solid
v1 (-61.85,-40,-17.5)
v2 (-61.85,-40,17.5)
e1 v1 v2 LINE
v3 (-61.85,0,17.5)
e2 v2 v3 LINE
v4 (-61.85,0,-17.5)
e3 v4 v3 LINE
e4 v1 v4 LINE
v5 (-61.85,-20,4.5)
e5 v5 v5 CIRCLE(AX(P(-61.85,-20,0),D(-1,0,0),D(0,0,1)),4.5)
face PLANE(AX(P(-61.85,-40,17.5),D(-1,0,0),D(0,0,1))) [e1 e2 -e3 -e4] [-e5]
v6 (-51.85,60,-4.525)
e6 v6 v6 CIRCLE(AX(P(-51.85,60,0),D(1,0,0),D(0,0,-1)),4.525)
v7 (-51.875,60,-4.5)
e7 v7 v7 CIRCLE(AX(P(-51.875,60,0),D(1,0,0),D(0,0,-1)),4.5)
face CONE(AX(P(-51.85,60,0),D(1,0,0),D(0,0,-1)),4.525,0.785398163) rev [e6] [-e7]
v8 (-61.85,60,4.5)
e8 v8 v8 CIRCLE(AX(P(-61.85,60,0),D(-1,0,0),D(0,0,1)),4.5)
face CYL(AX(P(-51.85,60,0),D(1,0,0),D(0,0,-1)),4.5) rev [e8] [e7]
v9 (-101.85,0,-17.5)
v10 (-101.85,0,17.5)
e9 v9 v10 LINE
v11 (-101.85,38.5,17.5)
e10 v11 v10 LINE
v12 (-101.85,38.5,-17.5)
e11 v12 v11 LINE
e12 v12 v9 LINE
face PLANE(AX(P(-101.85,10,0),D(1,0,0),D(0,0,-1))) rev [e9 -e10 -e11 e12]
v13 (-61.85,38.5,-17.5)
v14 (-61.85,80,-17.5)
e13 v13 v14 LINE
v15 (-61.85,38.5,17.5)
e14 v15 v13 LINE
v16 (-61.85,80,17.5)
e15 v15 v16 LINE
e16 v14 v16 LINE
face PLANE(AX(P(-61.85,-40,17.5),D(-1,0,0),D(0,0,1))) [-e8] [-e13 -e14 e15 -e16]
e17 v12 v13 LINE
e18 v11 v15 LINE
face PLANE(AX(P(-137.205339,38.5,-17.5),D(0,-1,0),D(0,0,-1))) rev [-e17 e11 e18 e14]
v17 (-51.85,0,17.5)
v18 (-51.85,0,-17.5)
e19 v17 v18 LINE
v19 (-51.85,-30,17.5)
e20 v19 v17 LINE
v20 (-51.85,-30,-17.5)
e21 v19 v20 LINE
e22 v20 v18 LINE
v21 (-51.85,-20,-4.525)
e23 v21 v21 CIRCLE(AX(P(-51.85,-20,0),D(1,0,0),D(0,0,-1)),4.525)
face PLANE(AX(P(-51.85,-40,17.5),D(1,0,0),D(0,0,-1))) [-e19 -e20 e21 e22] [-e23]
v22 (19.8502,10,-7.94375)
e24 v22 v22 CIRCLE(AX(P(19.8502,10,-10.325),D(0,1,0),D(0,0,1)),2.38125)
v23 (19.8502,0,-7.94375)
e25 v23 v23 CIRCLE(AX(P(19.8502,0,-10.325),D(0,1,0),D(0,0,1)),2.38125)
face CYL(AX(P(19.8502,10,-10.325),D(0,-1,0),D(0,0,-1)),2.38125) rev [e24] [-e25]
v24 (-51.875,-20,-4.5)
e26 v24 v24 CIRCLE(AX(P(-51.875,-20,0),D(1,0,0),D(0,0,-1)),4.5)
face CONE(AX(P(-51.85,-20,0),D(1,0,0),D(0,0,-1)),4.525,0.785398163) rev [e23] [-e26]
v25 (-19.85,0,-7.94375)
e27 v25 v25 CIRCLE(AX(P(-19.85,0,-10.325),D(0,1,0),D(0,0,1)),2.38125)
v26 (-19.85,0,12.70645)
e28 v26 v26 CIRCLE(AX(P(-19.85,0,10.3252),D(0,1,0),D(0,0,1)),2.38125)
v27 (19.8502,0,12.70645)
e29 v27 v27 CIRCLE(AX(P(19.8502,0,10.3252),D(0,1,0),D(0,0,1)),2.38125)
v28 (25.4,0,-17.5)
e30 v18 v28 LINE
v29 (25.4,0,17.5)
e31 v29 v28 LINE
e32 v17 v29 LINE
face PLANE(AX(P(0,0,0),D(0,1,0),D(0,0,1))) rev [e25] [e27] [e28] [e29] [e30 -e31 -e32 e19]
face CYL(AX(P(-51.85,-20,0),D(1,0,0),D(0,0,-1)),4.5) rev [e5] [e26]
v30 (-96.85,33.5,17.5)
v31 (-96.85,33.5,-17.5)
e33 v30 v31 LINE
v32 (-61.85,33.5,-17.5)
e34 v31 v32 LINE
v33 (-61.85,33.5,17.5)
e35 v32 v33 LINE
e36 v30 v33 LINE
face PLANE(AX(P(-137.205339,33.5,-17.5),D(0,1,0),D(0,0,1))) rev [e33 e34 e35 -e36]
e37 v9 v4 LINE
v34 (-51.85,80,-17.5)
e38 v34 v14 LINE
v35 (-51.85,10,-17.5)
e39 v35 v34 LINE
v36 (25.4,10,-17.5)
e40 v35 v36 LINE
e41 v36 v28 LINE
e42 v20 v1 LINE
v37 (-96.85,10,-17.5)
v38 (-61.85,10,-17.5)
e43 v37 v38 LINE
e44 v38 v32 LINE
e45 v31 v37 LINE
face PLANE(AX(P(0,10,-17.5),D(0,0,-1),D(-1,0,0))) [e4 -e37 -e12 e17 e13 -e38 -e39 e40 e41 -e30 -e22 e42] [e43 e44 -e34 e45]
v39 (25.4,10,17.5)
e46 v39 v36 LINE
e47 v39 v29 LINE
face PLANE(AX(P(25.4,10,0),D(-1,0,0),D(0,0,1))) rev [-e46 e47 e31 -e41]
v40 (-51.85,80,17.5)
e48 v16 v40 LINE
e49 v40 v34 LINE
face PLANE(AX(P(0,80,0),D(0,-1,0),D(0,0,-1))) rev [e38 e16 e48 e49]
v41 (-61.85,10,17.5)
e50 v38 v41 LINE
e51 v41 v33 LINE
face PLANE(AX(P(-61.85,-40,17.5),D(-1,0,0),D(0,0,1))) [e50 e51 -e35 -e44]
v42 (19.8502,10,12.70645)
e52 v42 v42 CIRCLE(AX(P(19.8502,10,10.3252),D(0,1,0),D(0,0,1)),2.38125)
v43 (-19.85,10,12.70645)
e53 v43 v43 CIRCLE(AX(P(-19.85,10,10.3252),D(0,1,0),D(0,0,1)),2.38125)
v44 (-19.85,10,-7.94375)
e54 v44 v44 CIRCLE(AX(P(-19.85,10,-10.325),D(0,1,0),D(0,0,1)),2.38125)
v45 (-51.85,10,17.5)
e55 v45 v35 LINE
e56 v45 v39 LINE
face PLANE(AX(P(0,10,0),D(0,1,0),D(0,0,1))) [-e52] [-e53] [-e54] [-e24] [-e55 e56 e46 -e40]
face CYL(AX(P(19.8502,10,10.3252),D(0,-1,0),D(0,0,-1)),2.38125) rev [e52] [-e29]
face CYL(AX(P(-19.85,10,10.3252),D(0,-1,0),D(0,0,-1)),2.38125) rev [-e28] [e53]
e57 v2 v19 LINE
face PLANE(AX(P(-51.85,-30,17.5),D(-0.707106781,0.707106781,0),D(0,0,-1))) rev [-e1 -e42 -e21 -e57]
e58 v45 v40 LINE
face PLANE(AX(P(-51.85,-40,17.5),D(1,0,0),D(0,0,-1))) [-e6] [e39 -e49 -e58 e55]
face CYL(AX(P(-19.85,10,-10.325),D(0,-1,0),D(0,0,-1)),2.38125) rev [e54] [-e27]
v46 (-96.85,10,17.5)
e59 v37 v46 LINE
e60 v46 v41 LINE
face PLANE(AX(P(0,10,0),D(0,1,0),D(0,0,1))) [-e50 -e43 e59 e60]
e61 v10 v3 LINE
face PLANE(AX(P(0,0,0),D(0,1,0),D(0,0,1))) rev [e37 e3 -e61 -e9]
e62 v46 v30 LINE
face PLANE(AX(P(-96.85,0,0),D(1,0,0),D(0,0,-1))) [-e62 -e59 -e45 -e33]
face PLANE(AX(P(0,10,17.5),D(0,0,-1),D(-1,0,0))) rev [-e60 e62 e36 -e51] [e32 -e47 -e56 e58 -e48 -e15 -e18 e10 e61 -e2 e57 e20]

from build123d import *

# Parameters (mm, degrees)
BOSS_EXTRUDE1_OUTLINE_W        = 127.25
BOSS_EXTRUDE1_OUTLINE_H        = 35
BOSS_EXTRUDE1_OUTLINE_R        = 2.38125
BOSS_EXTRUDE1_DEPTH            = 10
BOSS_EXTRUDE2_DEPTH            = 70
BOSS_EXTRUDE2_DEPTH_BACK       = 50
SKETCH2_W                      = 10
SKETCH2_H                      = 35
CHAMFER1_SIZE                  = 10
SKETCH8_W                      = 35
SKETCH8_H                      = 5
BOSS_EXTRUDE4_DEPTH            = 40
SKETCH9_W                      = 35
SKETCH9_H                      = 23.5
BOSS_EXTRUDE5_DEPTH            = 5
M8_CLEARANCE_HOLE2_D           = 9
M8_CLEARANCE_HOLE2_DEPTH       = 23
M8_CLEARANCE_HOLE2_CSINK_D     = 9.05
M8_CLEARANCE_HOLE2_CSINK_ANGLE = 90
M8_CLEARANCE_HOLE2_TIP         = 2.703872786


# Read off the part's stored shape, not the designer's step: Boss-Extrude1
with BuildPart() as part:
    # Boss-Extrude1 outline → Boss-Extrude1 (new body)
    with BuildSketch(Plane(origin=(0, 0, 0), x_dir=(1, 0, 0), z_dir=(0, 1, 0))):
        with Locations((-38.225, 0)):
            Rectangle(BOSS_EXTRUDE1_OUTLINE_W, BOSS_EXTRUDE1_OUTLINE_H)
        with Locations((-19.85, -10.3252)):
            Circle(BOSS_EXTRUDE1_OUTLINE_R, mode=Mode.SUBTRACT)
        with Locations((19.8502, -10.3252)):
            Circle(BOSS_EXTRUDE1_OUTLINE_R, mode=Mode.SUBTRACT)
        with Locations((-19.85, 10.325)):
            Circle(BOSS_EXTRUDE1_OUTLINE_R, mode=Mode.SUBTRACT)
        with Locations((19.8502, 10.325)):
            Circle(BOSS_EXTRUDE1_OUTLINE_R, mode=Mode.SUBTRACT)
    extrude(amount=BOSS_EXTRUDE1_DEPTH)

    # Sketch2 → Boss-Extrude2 (add, two sides: drawn at the far end of the back side and taken through both)
    with BuildSketch(Plane(origin=(0, 10, 0), x_dir=(1, 0, 0), z_dir=(0, 1, 0)).offset(-BOSS_EXTRUDE2_DEPTH_BACK)):
        with Locations((-56.85, 0)):
            Rectangle(SKETCH2_W, SKETCH2_H)
    extrude(amount=BOSS_EXTRUDE2_DEPTH + BOSS_EXTRUDE2_DEPTH_BACK)

    # Chamfer1
    chamfer1_edges = [part.edges().sort_by_distance(p)[0] for p in [
        (-51.85, -40, 0),
    ]]
    chamfer(chamfer1_edges, length=CHAMFER1_SIZE - 0.0001)  # a hair under: the kernel refuses the full size

    # Sketch8 → Boss-Extrude4 (add)
    with BuildSketch(Plane.ZY.offset(61.85)):
        with Locations((0, 36)):
            Rectangle(SKETCH8_W, SKETCH8_H)
    extrude(amount=BOSS_EXTRUDE4_DEPTH)

    # Sketch9 → Boss-Extrude5 (add)
    with BuildSketch(Plane.ZY.offset(101.85)):
        with Locations((0, 21.75)):
            Rectangle(SKETCH9_W, SKETCH9_H)
    extrude(amount=-BOSS_EXTRUDE5_DEPTH)

    # M8 Clearance Hole2
    with Locations(Plane(origin=(-51.85, 0, 0), x_dir=(0, 0, -1), z_dir=(1, 0, 0))):
        with Locations((0, 60), (0, -20)):
            CounterSinkHole(M8_CLEARANCE_HOLE2_D / 2, M8_CLEARANCE_HOLE2_CSINK_D / 2, depth=M8_CLEARANCE_HOLE2_DEPTH, counter_sink_angle=M8_CLEARANCE_HOLE2_CSINK_ANGLE)
            with Locations((0, 0, -(M8_CLEARANCE_HOLE2_DEPTH + M8_CLEARANCE_HOLE2_TIP / 2))):  # 118° drill point
                Cone(0, M8_CLEARANCE_HOLE2_D / 2, M8_CLEARANCE_HOLE2_TIP, mode=Mode.SUBTRACT)


solid = part.part
